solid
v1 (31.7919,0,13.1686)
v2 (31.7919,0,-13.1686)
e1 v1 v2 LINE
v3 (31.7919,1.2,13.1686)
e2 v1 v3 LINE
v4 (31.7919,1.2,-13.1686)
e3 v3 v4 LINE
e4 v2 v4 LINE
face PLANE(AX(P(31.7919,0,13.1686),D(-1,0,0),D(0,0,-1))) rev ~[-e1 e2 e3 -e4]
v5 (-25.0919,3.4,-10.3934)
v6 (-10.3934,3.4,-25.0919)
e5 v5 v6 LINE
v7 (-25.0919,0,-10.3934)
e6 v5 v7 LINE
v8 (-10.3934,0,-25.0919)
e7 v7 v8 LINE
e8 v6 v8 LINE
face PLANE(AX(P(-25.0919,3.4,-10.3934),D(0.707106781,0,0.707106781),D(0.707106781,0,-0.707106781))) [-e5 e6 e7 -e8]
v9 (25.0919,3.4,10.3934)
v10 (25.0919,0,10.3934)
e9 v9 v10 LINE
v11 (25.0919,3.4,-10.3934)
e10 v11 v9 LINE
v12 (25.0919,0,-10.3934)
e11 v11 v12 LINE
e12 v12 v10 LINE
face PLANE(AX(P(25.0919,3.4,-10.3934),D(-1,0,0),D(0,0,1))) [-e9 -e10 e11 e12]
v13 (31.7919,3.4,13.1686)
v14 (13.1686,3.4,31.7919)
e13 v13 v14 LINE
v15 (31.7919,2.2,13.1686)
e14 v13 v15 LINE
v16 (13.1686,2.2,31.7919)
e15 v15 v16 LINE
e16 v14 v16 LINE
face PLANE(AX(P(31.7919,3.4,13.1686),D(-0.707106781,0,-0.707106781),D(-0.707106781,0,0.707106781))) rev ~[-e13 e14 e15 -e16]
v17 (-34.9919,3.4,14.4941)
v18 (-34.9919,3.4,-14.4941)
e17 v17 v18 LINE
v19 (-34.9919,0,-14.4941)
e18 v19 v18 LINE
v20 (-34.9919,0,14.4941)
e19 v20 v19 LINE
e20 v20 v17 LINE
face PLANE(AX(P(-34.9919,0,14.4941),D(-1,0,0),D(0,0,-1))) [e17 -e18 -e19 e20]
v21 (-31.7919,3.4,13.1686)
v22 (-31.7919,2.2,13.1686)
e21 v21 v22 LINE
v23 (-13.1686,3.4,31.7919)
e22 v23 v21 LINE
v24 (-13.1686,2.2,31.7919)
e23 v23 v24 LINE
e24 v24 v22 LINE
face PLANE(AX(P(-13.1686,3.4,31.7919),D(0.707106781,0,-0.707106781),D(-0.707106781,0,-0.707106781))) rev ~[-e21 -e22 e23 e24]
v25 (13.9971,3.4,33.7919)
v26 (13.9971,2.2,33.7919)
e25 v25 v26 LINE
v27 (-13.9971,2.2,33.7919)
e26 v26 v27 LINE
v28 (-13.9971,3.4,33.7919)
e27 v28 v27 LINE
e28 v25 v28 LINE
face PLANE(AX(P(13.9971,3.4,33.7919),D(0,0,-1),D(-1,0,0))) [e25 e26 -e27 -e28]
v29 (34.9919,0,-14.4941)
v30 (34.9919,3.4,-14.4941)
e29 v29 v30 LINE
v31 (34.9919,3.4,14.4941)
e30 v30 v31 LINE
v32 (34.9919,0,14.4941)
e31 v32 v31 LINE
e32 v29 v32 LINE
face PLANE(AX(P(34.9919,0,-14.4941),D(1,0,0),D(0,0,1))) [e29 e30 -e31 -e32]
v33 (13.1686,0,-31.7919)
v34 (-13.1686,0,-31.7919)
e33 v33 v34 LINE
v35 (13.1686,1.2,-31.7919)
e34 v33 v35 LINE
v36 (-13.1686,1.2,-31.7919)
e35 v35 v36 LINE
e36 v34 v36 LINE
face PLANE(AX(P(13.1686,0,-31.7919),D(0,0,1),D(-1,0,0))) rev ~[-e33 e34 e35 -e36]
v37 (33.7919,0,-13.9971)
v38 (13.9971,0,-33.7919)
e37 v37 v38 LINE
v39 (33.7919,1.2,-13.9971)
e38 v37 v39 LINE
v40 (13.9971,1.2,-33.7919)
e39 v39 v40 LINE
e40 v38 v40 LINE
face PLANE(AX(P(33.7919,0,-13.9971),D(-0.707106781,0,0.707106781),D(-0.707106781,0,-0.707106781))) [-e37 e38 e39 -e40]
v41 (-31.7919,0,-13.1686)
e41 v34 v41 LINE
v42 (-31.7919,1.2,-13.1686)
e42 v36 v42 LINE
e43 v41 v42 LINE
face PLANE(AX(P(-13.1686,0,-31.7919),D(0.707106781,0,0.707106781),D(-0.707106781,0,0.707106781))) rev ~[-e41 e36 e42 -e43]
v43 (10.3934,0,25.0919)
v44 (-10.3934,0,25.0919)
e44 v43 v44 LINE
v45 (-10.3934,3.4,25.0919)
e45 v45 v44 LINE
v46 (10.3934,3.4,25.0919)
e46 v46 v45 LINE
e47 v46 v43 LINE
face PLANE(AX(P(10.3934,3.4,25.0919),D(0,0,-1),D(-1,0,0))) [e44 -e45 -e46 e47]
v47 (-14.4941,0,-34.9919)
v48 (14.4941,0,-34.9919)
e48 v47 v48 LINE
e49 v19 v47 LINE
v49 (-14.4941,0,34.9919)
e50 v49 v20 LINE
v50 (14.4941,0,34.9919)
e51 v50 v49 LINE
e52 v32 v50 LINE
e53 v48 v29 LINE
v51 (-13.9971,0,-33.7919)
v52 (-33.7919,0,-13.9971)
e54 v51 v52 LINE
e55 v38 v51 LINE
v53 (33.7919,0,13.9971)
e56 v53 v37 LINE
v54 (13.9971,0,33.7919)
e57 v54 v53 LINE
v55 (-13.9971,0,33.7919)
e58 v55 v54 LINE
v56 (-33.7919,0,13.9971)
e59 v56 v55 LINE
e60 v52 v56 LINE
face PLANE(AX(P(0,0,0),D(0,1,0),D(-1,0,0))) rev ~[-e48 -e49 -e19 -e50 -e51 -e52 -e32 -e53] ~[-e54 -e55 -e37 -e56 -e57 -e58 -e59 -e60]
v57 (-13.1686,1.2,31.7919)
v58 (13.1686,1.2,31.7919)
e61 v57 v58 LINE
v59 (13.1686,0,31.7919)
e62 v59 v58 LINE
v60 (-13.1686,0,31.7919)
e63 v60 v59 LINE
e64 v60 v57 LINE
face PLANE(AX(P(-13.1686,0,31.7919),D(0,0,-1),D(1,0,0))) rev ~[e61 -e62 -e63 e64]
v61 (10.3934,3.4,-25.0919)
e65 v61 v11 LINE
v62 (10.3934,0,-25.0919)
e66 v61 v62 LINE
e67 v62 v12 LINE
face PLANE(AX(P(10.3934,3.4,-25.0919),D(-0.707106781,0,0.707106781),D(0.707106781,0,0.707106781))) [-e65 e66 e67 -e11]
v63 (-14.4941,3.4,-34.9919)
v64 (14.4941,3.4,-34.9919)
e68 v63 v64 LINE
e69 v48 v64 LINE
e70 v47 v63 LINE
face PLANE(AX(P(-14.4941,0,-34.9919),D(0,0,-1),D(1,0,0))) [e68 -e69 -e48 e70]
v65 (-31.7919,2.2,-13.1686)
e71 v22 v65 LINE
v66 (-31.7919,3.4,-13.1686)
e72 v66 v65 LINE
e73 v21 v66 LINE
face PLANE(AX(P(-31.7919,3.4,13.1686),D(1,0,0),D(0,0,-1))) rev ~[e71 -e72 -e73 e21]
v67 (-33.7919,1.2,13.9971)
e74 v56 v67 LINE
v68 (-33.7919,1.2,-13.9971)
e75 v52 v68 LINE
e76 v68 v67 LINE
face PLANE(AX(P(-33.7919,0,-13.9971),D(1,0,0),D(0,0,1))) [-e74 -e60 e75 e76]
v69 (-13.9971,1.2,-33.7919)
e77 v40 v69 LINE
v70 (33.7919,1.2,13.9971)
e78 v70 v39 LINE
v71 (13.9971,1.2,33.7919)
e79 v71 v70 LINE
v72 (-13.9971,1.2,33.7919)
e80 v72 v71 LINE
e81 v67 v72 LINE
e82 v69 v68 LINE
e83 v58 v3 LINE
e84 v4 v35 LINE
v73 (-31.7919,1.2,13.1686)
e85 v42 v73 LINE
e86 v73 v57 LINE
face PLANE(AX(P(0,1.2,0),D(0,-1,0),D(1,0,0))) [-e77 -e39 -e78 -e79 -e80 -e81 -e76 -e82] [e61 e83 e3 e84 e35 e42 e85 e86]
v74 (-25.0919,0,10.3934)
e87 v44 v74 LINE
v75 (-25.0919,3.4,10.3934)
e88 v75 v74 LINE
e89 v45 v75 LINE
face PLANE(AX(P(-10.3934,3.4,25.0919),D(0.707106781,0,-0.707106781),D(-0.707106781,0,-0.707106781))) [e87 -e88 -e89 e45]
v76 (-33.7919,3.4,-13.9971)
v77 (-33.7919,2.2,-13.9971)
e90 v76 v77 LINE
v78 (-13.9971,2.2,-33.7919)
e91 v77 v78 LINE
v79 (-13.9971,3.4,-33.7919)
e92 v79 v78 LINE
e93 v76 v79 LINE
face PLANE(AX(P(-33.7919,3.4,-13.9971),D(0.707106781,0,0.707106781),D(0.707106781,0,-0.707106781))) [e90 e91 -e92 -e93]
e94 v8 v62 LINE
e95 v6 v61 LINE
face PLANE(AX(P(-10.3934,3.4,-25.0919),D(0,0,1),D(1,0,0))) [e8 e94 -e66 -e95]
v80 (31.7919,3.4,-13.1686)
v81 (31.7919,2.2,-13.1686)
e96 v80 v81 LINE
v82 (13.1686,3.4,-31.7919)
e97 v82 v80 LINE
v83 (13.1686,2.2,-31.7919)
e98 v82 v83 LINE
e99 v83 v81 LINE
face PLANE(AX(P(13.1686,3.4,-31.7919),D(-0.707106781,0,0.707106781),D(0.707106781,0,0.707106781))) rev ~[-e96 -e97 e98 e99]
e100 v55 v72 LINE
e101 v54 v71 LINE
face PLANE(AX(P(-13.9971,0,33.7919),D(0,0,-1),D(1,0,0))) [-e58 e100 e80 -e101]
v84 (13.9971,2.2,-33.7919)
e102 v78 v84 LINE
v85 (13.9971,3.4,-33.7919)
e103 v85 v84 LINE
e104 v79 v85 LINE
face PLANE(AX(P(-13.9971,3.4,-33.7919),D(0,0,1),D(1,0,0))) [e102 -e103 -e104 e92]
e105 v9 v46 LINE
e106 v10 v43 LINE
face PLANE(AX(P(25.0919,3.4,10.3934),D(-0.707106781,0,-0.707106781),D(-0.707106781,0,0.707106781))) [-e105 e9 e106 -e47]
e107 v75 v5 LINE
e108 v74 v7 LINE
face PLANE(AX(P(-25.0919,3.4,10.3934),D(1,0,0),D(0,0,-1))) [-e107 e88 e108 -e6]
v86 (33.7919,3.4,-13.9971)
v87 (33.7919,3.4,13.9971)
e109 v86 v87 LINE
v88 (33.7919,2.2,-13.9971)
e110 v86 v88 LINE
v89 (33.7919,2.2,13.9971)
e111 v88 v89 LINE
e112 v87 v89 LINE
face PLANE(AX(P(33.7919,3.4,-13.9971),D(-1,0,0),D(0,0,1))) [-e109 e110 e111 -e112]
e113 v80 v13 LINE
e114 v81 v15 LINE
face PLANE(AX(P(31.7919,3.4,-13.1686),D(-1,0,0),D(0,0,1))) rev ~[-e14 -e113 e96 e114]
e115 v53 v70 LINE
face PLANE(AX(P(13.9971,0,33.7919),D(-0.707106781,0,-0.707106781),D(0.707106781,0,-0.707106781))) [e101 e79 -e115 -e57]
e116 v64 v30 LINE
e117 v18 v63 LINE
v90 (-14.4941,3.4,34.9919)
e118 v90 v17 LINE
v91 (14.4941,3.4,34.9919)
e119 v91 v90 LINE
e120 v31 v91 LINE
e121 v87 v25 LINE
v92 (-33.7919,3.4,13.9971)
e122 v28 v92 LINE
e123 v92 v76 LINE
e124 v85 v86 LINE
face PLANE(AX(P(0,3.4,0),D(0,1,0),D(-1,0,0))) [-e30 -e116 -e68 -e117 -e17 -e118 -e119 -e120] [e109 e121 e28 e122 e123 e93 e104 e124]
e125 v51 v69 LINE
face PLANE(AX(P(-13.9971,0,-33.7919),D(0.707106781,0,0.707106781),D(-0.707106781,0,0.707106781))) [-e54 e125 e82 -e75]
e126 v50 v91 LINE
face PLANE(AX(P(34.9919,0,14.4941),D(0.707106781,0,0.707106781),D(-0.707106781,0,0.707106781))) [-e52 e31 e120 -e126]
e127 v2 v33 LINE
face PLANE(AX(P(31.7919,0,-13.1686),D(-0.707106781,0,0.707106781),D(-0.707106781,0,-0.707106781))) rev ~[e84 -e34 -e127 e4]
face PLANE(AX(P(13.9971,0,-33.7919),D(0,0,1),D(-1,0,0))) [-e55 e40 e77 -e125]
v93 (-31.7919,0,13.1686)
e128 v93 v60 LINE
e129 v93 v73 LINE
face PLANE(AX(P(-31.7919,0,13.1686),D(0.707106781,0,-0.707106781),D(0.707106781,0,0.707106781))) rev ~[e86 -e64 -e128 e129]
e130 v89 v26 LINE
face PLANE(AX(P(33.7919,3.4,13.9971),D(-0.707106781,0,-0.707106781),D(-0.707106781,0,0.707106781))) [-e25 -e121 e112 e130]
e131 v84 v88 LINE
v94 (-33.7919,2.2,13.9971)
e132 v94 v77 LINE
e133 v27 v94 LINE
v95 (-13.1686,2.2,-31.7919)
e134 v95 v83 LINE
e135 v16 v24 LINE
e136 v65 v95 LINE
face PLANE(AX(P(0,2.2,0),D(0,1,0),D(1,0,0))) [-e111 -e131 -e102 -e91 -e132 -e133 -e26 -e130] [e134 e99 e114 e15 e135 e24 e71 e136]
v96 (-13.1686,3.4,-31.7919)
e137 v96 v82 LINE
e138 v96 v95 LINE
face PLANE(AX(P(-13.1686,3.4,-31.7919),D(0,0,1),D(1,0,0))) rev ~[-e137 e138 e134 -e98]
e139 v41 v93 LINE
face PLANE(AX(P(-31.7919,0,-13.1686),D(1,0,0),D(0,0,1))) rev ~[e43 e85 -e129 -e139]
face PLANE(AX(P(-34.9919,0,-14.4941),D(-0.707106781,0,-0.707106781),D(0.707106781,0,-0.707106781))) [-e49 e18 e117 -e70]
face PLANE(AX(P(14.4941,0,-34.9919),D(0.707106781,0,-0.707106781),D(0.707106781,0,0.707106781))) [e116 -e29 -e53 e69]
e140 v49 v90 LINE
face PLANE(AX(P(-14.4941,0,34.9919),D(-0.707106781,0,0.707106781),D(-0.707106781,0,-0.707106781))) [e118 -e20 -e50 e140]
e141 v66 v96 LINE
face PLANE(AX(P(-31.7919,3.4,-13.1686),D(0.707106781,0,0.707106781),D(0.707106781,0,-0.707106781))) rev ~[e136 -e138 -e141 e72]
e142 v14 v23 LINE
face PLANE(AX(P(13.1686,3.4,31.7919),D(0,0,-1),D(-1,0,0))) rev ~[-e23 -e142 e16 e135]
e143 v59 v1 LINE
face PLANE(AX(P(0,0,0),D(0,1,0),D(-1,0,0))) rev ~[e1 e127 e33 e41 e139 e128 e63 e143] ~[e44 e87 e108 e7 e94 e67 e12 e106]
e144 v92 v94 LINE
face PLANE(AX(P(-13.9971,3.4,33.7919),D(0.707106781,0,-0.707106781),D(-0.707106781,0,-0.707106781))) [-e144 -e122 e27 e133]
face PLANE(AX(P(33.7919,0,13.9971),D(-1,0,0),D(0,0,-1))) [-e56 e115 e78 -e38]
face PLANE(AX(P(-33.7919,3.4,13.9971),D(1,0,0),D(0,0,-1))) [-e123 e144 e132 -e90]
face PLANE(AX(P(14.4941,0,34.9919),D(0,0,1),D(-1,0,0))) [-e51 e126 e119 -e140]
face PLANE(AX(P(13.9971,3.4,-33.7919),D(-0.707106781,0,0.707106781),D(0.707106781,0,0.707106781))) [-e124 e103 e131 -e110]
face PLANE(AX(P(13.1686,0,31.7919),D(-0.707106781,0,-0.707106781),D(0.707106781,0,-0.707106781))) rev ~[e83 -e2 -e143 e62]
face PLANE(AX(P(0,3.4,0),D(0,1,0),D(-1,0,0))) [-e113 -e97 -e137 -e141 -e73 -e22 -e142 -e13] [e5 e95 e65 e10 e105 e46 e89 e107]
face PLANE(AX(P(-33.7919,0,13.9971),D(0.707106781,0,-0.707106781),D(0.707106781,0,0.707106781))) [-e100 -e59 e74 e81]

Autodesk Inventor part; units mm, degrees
ref_plane "YZ Plane" through (0, 0, 0) normal (1, 0, 0) x (0, 1, 0)
ref_plane "XZ Plane" through (0, 0, 0) normal (0, 1, 0) x (-1, 0, 0)
ref_plane "XY Plane" through (0, 0, 0) normal (0, 0, 1) x (1, 0, 0)
sketch "스케치1" plane through (0, 0, 0) normal (0, 1, 0) x (-1, 0, 0)
  line L0 (-32.5919, 13.5) -> (-13.5, 32.5919)
  line L1 (-13.5, 32.5919) -> (13.5, 32.5919)
  line L2 (13.5, 32.5919) -> (32.5919, 13.5)
  line L3 (32.5919, 13.5) -> (32.5919, -13.5)
  line L4 (32.5919, -13.5) -> (13.5, -32.5919)
  line L5 (13.5, -32.5919) -> (-13.5, -32.5919)
  line L6 (-13.5, -32.5919) -> (-32.5919, -13.5)
  line L7 (-32.5919, -13.5) -> (-32.5919, 13.5)
  line L8 (34.9919, 14.4941) -> (34.9919, -14.4941)
  line L9 (34.9919, -14.4941) -> (14.4941, -34.9919)
  line L10 (14.4941, -34.9919) -> (-14.4941, -34.9919)
  line L11 (-14.4941, -34.9919) -> (-34.9919, -14.4941)
  line L12 (-34.9919, -14.4941) -> (-34.9919, 14.4941)
  line L13 (-34.9919, 14.4941) -> (-14.4941, 34.9919)
  line L14 (-14.4941, 34.9919) -> (14.4941, 34.9919)
  line L15 (14.4941, 34.9919) -> (34.9919, 14.4941)
  point P0 (0, 0)
  point P1 (0, 0)
  point P2 (0, 0)
  dimension "d0" = 27
  dimension "d1" = 2.4
extrude "돌출1" add sketch "스케치1" along normal blind 3.4 contours L0 L1 L2 L3 L4 L5 L6 L7 | L8 L9 L10 L11 L12 L13 L14 L15
sketch "스케치2" plane through (0, 3.4, 0) normal (0, 1, 0) x (1, 0, 0)
  line L0 (13.5, -32.5919) -> (-13.5, -32.5919)
  line L1 (-13.5, -32.5919) -> (-32.5919, -13.5)
  line L2 (-32.5919, -13.5) -> (-32.5919, 13.5)
  line L3 (-32.5919, 13.5) -> (-13.5, 32.5919)
  line L4 (-13.5, 32.5919) -> (13.5, 32.5919)
  line L5 (13.5, 32.5919) -> (32.5919, 13.5)
  line L6 (32.5919, 13.5) -> (32.5919, -13.5)
  line L7 (32.5919, -13.5) -> (13.5, -32.5919)
  line L8 (-13.9971, -33.7919) -> (-33.7919, -13.9971)
  line L9 (-33.7919, -13.9971) -> (-33.7919, 13.9971)
  line L10 (-33.7919, 13.9971) -> (-13.9971, 33.7919)
  line L11 (-13.9971, 33.7919) -> (13.9971, 33.7919)
  line L12 (13.9971, 33.7919) -> (33.7919, 13.9971)
  line L13 (33.7919, 13.9971) -> (33.7919, -13.9971)
  line L14 (33.7919, -13.9971) -> (13.9971, -33.7919)
  line L15 (13.9971, -33.7919) -> (-13.9971, -33.7919)
  line L16 (-13.1686, 31.7919) -> (13.1686, 31.7919)
  line L17 (13.1686, 31.7919) -> (31.7919, 13.1686)
  line L18 (31.7919, 13.1686) -> (31.7919, -13.1686)
  line L19 (31.7919, -13.1686) -> (13.1686, -31.7919)
  line L20 (13.1686, -31.7919) -> (-13.1686, -31.7919)
  line L21 (-13.1686, -31.7919) -> (-31.7919, -13.1686)
  line L22 (-31.7919, -13.1686) -> (-31.7919, 13.1686)
  line L23 (-31.7919, 13.1686) -> (-13.1686, 31.7919)
  point P0 (0, 0)
  point P1 (0, 0)
  point P2 (0, 0)
  point P3 (0, 0)
  dimension "d4" = 27
  dimension "d5" = 1.2
  dimension "d16" = 0.8
sketch "스케치3" plane through (0, 0, 0) normal (0, -1, 0) x (1, 0, 0)
  line L0 (-13.5, 32.5919) -> (13.5, 32.5919)
  line L1 (13.5, 32.5919) -> (32.5919, 13.5)
  line L2 (32.5919, 13.5) -> (32.5919, -13.5)
  line L3 (32.5919, -13.5) -> (13.5, -32.5919)
  line L4 (13.5, -32.5919) -> (-13.5, -32.5919)
  line L5 (-13.5, -32.5919) -> (-32.5919, -13.5)
  line L6 (-32.5919, -13.5) -> (-32.5919, 13.5)
  line L7 (-32.5919, 13.5) -> (-13.5, 32.5919)
  line L8 (-13.9971, 33.7919) -> (13.9971, 33.7919)
  line L9 (13.9971, 33.7919) -> (33.7919, 13.9971)
  line L10 (33.7919, 13.9971) -> (33.7919, -13.9971)
  line L11 (33.7919, -13.9971) -> (13.9971, -33.7919)
  line L12 (13.9971, -33.7919) -> (-13.9971, -33.7919)
  line L13 (-13.9971, -33.7919) -> (-33.7919, -13.9971)
  line L14 (-33.7919, -13.9971) -> (-33.7919, 13.9971)
  line L15 (-33.7919, 13.9971) -> (-13.9971, 33.7919)
  line L16 (-13.1686, 31.7919) -> (13.1686, 31.7919)
  line L17 (13.1686, 31.7919) -> (31.7919, 13.1686)
  line L18 (31.7919, 13.1686) -> (31.7919, -13.1686)
  line L19 (31.7919, -13.1686) -> (13.1686, -31.7919)
  line L20 (13.1686, -31.7919) -> (-13.1686, -31.7919)
  line L21 (-13.1686, -31.7919) -> (-31.7919, -13.1686)
  line L22 (-31.7919, -13.1686) -> (-31.7919, 13.1686)
  line L23 (-31.7919, 13.1686) -> (-13.1686, 31.7919)
  point P0 (0, 0)
  point P1 (0, 0)
  point P2 (0, 0)
  point P3 (0, 0)
  dimension "d8" = 27
  dimension "d9" = 1.2
  dimension "d19" = 0.8
extrude "돌출3" cut sketch "스케치3" against normal blind 1.2 contours L0 L1 L2 L3 L4 L5 L6 L7 | L8 L9 L10 L11 L12 L13 L14 L15
sketch "스케치4" plane through (0, 3.4, 0) normal (0, 1, 0) x (1, 0, 0)
  line L0 (10.3934, -25.0919) -> (-10.3934, -25.0919)
  line L1 (-10.3934, -25.0919) -> (-25.0919, -10.3934)
  line L2 (-25.0919, -10.3934) -> (-25.0919, 10.3934)
  line L3 (-25.0919, 10.3934) -> (-10.3934, 25.0919)
  line L4 (-10.3934, 25.0919) -> (10.3934, 25.0919)
  line L5 (10.3934, 25.0919) -> (25.0919, 10.3934)
  line L6 (25.0919, 10.3934) -> (25.0919, -10.3934)
  line L7 (25.0919, -10.3934) -> (10.3934, -25.0919)
  point P0 (0, 0)
  point P1 (0, 0)
  dimension "d20" = 20.7868
extrude "돌출4" cut sketch "스케치4" against normal blind 5
extrude "돌출5" cut sketch "스케치2" against normal blind 1.2 contours L0 L1 L2 L3 L4 L5 L6 L7 | L8 L9 L10 L11 L12 L13 L14 L15
properties part number "팔각형 OV-PAM 5패턴 링 - 틈 너비 수정"
